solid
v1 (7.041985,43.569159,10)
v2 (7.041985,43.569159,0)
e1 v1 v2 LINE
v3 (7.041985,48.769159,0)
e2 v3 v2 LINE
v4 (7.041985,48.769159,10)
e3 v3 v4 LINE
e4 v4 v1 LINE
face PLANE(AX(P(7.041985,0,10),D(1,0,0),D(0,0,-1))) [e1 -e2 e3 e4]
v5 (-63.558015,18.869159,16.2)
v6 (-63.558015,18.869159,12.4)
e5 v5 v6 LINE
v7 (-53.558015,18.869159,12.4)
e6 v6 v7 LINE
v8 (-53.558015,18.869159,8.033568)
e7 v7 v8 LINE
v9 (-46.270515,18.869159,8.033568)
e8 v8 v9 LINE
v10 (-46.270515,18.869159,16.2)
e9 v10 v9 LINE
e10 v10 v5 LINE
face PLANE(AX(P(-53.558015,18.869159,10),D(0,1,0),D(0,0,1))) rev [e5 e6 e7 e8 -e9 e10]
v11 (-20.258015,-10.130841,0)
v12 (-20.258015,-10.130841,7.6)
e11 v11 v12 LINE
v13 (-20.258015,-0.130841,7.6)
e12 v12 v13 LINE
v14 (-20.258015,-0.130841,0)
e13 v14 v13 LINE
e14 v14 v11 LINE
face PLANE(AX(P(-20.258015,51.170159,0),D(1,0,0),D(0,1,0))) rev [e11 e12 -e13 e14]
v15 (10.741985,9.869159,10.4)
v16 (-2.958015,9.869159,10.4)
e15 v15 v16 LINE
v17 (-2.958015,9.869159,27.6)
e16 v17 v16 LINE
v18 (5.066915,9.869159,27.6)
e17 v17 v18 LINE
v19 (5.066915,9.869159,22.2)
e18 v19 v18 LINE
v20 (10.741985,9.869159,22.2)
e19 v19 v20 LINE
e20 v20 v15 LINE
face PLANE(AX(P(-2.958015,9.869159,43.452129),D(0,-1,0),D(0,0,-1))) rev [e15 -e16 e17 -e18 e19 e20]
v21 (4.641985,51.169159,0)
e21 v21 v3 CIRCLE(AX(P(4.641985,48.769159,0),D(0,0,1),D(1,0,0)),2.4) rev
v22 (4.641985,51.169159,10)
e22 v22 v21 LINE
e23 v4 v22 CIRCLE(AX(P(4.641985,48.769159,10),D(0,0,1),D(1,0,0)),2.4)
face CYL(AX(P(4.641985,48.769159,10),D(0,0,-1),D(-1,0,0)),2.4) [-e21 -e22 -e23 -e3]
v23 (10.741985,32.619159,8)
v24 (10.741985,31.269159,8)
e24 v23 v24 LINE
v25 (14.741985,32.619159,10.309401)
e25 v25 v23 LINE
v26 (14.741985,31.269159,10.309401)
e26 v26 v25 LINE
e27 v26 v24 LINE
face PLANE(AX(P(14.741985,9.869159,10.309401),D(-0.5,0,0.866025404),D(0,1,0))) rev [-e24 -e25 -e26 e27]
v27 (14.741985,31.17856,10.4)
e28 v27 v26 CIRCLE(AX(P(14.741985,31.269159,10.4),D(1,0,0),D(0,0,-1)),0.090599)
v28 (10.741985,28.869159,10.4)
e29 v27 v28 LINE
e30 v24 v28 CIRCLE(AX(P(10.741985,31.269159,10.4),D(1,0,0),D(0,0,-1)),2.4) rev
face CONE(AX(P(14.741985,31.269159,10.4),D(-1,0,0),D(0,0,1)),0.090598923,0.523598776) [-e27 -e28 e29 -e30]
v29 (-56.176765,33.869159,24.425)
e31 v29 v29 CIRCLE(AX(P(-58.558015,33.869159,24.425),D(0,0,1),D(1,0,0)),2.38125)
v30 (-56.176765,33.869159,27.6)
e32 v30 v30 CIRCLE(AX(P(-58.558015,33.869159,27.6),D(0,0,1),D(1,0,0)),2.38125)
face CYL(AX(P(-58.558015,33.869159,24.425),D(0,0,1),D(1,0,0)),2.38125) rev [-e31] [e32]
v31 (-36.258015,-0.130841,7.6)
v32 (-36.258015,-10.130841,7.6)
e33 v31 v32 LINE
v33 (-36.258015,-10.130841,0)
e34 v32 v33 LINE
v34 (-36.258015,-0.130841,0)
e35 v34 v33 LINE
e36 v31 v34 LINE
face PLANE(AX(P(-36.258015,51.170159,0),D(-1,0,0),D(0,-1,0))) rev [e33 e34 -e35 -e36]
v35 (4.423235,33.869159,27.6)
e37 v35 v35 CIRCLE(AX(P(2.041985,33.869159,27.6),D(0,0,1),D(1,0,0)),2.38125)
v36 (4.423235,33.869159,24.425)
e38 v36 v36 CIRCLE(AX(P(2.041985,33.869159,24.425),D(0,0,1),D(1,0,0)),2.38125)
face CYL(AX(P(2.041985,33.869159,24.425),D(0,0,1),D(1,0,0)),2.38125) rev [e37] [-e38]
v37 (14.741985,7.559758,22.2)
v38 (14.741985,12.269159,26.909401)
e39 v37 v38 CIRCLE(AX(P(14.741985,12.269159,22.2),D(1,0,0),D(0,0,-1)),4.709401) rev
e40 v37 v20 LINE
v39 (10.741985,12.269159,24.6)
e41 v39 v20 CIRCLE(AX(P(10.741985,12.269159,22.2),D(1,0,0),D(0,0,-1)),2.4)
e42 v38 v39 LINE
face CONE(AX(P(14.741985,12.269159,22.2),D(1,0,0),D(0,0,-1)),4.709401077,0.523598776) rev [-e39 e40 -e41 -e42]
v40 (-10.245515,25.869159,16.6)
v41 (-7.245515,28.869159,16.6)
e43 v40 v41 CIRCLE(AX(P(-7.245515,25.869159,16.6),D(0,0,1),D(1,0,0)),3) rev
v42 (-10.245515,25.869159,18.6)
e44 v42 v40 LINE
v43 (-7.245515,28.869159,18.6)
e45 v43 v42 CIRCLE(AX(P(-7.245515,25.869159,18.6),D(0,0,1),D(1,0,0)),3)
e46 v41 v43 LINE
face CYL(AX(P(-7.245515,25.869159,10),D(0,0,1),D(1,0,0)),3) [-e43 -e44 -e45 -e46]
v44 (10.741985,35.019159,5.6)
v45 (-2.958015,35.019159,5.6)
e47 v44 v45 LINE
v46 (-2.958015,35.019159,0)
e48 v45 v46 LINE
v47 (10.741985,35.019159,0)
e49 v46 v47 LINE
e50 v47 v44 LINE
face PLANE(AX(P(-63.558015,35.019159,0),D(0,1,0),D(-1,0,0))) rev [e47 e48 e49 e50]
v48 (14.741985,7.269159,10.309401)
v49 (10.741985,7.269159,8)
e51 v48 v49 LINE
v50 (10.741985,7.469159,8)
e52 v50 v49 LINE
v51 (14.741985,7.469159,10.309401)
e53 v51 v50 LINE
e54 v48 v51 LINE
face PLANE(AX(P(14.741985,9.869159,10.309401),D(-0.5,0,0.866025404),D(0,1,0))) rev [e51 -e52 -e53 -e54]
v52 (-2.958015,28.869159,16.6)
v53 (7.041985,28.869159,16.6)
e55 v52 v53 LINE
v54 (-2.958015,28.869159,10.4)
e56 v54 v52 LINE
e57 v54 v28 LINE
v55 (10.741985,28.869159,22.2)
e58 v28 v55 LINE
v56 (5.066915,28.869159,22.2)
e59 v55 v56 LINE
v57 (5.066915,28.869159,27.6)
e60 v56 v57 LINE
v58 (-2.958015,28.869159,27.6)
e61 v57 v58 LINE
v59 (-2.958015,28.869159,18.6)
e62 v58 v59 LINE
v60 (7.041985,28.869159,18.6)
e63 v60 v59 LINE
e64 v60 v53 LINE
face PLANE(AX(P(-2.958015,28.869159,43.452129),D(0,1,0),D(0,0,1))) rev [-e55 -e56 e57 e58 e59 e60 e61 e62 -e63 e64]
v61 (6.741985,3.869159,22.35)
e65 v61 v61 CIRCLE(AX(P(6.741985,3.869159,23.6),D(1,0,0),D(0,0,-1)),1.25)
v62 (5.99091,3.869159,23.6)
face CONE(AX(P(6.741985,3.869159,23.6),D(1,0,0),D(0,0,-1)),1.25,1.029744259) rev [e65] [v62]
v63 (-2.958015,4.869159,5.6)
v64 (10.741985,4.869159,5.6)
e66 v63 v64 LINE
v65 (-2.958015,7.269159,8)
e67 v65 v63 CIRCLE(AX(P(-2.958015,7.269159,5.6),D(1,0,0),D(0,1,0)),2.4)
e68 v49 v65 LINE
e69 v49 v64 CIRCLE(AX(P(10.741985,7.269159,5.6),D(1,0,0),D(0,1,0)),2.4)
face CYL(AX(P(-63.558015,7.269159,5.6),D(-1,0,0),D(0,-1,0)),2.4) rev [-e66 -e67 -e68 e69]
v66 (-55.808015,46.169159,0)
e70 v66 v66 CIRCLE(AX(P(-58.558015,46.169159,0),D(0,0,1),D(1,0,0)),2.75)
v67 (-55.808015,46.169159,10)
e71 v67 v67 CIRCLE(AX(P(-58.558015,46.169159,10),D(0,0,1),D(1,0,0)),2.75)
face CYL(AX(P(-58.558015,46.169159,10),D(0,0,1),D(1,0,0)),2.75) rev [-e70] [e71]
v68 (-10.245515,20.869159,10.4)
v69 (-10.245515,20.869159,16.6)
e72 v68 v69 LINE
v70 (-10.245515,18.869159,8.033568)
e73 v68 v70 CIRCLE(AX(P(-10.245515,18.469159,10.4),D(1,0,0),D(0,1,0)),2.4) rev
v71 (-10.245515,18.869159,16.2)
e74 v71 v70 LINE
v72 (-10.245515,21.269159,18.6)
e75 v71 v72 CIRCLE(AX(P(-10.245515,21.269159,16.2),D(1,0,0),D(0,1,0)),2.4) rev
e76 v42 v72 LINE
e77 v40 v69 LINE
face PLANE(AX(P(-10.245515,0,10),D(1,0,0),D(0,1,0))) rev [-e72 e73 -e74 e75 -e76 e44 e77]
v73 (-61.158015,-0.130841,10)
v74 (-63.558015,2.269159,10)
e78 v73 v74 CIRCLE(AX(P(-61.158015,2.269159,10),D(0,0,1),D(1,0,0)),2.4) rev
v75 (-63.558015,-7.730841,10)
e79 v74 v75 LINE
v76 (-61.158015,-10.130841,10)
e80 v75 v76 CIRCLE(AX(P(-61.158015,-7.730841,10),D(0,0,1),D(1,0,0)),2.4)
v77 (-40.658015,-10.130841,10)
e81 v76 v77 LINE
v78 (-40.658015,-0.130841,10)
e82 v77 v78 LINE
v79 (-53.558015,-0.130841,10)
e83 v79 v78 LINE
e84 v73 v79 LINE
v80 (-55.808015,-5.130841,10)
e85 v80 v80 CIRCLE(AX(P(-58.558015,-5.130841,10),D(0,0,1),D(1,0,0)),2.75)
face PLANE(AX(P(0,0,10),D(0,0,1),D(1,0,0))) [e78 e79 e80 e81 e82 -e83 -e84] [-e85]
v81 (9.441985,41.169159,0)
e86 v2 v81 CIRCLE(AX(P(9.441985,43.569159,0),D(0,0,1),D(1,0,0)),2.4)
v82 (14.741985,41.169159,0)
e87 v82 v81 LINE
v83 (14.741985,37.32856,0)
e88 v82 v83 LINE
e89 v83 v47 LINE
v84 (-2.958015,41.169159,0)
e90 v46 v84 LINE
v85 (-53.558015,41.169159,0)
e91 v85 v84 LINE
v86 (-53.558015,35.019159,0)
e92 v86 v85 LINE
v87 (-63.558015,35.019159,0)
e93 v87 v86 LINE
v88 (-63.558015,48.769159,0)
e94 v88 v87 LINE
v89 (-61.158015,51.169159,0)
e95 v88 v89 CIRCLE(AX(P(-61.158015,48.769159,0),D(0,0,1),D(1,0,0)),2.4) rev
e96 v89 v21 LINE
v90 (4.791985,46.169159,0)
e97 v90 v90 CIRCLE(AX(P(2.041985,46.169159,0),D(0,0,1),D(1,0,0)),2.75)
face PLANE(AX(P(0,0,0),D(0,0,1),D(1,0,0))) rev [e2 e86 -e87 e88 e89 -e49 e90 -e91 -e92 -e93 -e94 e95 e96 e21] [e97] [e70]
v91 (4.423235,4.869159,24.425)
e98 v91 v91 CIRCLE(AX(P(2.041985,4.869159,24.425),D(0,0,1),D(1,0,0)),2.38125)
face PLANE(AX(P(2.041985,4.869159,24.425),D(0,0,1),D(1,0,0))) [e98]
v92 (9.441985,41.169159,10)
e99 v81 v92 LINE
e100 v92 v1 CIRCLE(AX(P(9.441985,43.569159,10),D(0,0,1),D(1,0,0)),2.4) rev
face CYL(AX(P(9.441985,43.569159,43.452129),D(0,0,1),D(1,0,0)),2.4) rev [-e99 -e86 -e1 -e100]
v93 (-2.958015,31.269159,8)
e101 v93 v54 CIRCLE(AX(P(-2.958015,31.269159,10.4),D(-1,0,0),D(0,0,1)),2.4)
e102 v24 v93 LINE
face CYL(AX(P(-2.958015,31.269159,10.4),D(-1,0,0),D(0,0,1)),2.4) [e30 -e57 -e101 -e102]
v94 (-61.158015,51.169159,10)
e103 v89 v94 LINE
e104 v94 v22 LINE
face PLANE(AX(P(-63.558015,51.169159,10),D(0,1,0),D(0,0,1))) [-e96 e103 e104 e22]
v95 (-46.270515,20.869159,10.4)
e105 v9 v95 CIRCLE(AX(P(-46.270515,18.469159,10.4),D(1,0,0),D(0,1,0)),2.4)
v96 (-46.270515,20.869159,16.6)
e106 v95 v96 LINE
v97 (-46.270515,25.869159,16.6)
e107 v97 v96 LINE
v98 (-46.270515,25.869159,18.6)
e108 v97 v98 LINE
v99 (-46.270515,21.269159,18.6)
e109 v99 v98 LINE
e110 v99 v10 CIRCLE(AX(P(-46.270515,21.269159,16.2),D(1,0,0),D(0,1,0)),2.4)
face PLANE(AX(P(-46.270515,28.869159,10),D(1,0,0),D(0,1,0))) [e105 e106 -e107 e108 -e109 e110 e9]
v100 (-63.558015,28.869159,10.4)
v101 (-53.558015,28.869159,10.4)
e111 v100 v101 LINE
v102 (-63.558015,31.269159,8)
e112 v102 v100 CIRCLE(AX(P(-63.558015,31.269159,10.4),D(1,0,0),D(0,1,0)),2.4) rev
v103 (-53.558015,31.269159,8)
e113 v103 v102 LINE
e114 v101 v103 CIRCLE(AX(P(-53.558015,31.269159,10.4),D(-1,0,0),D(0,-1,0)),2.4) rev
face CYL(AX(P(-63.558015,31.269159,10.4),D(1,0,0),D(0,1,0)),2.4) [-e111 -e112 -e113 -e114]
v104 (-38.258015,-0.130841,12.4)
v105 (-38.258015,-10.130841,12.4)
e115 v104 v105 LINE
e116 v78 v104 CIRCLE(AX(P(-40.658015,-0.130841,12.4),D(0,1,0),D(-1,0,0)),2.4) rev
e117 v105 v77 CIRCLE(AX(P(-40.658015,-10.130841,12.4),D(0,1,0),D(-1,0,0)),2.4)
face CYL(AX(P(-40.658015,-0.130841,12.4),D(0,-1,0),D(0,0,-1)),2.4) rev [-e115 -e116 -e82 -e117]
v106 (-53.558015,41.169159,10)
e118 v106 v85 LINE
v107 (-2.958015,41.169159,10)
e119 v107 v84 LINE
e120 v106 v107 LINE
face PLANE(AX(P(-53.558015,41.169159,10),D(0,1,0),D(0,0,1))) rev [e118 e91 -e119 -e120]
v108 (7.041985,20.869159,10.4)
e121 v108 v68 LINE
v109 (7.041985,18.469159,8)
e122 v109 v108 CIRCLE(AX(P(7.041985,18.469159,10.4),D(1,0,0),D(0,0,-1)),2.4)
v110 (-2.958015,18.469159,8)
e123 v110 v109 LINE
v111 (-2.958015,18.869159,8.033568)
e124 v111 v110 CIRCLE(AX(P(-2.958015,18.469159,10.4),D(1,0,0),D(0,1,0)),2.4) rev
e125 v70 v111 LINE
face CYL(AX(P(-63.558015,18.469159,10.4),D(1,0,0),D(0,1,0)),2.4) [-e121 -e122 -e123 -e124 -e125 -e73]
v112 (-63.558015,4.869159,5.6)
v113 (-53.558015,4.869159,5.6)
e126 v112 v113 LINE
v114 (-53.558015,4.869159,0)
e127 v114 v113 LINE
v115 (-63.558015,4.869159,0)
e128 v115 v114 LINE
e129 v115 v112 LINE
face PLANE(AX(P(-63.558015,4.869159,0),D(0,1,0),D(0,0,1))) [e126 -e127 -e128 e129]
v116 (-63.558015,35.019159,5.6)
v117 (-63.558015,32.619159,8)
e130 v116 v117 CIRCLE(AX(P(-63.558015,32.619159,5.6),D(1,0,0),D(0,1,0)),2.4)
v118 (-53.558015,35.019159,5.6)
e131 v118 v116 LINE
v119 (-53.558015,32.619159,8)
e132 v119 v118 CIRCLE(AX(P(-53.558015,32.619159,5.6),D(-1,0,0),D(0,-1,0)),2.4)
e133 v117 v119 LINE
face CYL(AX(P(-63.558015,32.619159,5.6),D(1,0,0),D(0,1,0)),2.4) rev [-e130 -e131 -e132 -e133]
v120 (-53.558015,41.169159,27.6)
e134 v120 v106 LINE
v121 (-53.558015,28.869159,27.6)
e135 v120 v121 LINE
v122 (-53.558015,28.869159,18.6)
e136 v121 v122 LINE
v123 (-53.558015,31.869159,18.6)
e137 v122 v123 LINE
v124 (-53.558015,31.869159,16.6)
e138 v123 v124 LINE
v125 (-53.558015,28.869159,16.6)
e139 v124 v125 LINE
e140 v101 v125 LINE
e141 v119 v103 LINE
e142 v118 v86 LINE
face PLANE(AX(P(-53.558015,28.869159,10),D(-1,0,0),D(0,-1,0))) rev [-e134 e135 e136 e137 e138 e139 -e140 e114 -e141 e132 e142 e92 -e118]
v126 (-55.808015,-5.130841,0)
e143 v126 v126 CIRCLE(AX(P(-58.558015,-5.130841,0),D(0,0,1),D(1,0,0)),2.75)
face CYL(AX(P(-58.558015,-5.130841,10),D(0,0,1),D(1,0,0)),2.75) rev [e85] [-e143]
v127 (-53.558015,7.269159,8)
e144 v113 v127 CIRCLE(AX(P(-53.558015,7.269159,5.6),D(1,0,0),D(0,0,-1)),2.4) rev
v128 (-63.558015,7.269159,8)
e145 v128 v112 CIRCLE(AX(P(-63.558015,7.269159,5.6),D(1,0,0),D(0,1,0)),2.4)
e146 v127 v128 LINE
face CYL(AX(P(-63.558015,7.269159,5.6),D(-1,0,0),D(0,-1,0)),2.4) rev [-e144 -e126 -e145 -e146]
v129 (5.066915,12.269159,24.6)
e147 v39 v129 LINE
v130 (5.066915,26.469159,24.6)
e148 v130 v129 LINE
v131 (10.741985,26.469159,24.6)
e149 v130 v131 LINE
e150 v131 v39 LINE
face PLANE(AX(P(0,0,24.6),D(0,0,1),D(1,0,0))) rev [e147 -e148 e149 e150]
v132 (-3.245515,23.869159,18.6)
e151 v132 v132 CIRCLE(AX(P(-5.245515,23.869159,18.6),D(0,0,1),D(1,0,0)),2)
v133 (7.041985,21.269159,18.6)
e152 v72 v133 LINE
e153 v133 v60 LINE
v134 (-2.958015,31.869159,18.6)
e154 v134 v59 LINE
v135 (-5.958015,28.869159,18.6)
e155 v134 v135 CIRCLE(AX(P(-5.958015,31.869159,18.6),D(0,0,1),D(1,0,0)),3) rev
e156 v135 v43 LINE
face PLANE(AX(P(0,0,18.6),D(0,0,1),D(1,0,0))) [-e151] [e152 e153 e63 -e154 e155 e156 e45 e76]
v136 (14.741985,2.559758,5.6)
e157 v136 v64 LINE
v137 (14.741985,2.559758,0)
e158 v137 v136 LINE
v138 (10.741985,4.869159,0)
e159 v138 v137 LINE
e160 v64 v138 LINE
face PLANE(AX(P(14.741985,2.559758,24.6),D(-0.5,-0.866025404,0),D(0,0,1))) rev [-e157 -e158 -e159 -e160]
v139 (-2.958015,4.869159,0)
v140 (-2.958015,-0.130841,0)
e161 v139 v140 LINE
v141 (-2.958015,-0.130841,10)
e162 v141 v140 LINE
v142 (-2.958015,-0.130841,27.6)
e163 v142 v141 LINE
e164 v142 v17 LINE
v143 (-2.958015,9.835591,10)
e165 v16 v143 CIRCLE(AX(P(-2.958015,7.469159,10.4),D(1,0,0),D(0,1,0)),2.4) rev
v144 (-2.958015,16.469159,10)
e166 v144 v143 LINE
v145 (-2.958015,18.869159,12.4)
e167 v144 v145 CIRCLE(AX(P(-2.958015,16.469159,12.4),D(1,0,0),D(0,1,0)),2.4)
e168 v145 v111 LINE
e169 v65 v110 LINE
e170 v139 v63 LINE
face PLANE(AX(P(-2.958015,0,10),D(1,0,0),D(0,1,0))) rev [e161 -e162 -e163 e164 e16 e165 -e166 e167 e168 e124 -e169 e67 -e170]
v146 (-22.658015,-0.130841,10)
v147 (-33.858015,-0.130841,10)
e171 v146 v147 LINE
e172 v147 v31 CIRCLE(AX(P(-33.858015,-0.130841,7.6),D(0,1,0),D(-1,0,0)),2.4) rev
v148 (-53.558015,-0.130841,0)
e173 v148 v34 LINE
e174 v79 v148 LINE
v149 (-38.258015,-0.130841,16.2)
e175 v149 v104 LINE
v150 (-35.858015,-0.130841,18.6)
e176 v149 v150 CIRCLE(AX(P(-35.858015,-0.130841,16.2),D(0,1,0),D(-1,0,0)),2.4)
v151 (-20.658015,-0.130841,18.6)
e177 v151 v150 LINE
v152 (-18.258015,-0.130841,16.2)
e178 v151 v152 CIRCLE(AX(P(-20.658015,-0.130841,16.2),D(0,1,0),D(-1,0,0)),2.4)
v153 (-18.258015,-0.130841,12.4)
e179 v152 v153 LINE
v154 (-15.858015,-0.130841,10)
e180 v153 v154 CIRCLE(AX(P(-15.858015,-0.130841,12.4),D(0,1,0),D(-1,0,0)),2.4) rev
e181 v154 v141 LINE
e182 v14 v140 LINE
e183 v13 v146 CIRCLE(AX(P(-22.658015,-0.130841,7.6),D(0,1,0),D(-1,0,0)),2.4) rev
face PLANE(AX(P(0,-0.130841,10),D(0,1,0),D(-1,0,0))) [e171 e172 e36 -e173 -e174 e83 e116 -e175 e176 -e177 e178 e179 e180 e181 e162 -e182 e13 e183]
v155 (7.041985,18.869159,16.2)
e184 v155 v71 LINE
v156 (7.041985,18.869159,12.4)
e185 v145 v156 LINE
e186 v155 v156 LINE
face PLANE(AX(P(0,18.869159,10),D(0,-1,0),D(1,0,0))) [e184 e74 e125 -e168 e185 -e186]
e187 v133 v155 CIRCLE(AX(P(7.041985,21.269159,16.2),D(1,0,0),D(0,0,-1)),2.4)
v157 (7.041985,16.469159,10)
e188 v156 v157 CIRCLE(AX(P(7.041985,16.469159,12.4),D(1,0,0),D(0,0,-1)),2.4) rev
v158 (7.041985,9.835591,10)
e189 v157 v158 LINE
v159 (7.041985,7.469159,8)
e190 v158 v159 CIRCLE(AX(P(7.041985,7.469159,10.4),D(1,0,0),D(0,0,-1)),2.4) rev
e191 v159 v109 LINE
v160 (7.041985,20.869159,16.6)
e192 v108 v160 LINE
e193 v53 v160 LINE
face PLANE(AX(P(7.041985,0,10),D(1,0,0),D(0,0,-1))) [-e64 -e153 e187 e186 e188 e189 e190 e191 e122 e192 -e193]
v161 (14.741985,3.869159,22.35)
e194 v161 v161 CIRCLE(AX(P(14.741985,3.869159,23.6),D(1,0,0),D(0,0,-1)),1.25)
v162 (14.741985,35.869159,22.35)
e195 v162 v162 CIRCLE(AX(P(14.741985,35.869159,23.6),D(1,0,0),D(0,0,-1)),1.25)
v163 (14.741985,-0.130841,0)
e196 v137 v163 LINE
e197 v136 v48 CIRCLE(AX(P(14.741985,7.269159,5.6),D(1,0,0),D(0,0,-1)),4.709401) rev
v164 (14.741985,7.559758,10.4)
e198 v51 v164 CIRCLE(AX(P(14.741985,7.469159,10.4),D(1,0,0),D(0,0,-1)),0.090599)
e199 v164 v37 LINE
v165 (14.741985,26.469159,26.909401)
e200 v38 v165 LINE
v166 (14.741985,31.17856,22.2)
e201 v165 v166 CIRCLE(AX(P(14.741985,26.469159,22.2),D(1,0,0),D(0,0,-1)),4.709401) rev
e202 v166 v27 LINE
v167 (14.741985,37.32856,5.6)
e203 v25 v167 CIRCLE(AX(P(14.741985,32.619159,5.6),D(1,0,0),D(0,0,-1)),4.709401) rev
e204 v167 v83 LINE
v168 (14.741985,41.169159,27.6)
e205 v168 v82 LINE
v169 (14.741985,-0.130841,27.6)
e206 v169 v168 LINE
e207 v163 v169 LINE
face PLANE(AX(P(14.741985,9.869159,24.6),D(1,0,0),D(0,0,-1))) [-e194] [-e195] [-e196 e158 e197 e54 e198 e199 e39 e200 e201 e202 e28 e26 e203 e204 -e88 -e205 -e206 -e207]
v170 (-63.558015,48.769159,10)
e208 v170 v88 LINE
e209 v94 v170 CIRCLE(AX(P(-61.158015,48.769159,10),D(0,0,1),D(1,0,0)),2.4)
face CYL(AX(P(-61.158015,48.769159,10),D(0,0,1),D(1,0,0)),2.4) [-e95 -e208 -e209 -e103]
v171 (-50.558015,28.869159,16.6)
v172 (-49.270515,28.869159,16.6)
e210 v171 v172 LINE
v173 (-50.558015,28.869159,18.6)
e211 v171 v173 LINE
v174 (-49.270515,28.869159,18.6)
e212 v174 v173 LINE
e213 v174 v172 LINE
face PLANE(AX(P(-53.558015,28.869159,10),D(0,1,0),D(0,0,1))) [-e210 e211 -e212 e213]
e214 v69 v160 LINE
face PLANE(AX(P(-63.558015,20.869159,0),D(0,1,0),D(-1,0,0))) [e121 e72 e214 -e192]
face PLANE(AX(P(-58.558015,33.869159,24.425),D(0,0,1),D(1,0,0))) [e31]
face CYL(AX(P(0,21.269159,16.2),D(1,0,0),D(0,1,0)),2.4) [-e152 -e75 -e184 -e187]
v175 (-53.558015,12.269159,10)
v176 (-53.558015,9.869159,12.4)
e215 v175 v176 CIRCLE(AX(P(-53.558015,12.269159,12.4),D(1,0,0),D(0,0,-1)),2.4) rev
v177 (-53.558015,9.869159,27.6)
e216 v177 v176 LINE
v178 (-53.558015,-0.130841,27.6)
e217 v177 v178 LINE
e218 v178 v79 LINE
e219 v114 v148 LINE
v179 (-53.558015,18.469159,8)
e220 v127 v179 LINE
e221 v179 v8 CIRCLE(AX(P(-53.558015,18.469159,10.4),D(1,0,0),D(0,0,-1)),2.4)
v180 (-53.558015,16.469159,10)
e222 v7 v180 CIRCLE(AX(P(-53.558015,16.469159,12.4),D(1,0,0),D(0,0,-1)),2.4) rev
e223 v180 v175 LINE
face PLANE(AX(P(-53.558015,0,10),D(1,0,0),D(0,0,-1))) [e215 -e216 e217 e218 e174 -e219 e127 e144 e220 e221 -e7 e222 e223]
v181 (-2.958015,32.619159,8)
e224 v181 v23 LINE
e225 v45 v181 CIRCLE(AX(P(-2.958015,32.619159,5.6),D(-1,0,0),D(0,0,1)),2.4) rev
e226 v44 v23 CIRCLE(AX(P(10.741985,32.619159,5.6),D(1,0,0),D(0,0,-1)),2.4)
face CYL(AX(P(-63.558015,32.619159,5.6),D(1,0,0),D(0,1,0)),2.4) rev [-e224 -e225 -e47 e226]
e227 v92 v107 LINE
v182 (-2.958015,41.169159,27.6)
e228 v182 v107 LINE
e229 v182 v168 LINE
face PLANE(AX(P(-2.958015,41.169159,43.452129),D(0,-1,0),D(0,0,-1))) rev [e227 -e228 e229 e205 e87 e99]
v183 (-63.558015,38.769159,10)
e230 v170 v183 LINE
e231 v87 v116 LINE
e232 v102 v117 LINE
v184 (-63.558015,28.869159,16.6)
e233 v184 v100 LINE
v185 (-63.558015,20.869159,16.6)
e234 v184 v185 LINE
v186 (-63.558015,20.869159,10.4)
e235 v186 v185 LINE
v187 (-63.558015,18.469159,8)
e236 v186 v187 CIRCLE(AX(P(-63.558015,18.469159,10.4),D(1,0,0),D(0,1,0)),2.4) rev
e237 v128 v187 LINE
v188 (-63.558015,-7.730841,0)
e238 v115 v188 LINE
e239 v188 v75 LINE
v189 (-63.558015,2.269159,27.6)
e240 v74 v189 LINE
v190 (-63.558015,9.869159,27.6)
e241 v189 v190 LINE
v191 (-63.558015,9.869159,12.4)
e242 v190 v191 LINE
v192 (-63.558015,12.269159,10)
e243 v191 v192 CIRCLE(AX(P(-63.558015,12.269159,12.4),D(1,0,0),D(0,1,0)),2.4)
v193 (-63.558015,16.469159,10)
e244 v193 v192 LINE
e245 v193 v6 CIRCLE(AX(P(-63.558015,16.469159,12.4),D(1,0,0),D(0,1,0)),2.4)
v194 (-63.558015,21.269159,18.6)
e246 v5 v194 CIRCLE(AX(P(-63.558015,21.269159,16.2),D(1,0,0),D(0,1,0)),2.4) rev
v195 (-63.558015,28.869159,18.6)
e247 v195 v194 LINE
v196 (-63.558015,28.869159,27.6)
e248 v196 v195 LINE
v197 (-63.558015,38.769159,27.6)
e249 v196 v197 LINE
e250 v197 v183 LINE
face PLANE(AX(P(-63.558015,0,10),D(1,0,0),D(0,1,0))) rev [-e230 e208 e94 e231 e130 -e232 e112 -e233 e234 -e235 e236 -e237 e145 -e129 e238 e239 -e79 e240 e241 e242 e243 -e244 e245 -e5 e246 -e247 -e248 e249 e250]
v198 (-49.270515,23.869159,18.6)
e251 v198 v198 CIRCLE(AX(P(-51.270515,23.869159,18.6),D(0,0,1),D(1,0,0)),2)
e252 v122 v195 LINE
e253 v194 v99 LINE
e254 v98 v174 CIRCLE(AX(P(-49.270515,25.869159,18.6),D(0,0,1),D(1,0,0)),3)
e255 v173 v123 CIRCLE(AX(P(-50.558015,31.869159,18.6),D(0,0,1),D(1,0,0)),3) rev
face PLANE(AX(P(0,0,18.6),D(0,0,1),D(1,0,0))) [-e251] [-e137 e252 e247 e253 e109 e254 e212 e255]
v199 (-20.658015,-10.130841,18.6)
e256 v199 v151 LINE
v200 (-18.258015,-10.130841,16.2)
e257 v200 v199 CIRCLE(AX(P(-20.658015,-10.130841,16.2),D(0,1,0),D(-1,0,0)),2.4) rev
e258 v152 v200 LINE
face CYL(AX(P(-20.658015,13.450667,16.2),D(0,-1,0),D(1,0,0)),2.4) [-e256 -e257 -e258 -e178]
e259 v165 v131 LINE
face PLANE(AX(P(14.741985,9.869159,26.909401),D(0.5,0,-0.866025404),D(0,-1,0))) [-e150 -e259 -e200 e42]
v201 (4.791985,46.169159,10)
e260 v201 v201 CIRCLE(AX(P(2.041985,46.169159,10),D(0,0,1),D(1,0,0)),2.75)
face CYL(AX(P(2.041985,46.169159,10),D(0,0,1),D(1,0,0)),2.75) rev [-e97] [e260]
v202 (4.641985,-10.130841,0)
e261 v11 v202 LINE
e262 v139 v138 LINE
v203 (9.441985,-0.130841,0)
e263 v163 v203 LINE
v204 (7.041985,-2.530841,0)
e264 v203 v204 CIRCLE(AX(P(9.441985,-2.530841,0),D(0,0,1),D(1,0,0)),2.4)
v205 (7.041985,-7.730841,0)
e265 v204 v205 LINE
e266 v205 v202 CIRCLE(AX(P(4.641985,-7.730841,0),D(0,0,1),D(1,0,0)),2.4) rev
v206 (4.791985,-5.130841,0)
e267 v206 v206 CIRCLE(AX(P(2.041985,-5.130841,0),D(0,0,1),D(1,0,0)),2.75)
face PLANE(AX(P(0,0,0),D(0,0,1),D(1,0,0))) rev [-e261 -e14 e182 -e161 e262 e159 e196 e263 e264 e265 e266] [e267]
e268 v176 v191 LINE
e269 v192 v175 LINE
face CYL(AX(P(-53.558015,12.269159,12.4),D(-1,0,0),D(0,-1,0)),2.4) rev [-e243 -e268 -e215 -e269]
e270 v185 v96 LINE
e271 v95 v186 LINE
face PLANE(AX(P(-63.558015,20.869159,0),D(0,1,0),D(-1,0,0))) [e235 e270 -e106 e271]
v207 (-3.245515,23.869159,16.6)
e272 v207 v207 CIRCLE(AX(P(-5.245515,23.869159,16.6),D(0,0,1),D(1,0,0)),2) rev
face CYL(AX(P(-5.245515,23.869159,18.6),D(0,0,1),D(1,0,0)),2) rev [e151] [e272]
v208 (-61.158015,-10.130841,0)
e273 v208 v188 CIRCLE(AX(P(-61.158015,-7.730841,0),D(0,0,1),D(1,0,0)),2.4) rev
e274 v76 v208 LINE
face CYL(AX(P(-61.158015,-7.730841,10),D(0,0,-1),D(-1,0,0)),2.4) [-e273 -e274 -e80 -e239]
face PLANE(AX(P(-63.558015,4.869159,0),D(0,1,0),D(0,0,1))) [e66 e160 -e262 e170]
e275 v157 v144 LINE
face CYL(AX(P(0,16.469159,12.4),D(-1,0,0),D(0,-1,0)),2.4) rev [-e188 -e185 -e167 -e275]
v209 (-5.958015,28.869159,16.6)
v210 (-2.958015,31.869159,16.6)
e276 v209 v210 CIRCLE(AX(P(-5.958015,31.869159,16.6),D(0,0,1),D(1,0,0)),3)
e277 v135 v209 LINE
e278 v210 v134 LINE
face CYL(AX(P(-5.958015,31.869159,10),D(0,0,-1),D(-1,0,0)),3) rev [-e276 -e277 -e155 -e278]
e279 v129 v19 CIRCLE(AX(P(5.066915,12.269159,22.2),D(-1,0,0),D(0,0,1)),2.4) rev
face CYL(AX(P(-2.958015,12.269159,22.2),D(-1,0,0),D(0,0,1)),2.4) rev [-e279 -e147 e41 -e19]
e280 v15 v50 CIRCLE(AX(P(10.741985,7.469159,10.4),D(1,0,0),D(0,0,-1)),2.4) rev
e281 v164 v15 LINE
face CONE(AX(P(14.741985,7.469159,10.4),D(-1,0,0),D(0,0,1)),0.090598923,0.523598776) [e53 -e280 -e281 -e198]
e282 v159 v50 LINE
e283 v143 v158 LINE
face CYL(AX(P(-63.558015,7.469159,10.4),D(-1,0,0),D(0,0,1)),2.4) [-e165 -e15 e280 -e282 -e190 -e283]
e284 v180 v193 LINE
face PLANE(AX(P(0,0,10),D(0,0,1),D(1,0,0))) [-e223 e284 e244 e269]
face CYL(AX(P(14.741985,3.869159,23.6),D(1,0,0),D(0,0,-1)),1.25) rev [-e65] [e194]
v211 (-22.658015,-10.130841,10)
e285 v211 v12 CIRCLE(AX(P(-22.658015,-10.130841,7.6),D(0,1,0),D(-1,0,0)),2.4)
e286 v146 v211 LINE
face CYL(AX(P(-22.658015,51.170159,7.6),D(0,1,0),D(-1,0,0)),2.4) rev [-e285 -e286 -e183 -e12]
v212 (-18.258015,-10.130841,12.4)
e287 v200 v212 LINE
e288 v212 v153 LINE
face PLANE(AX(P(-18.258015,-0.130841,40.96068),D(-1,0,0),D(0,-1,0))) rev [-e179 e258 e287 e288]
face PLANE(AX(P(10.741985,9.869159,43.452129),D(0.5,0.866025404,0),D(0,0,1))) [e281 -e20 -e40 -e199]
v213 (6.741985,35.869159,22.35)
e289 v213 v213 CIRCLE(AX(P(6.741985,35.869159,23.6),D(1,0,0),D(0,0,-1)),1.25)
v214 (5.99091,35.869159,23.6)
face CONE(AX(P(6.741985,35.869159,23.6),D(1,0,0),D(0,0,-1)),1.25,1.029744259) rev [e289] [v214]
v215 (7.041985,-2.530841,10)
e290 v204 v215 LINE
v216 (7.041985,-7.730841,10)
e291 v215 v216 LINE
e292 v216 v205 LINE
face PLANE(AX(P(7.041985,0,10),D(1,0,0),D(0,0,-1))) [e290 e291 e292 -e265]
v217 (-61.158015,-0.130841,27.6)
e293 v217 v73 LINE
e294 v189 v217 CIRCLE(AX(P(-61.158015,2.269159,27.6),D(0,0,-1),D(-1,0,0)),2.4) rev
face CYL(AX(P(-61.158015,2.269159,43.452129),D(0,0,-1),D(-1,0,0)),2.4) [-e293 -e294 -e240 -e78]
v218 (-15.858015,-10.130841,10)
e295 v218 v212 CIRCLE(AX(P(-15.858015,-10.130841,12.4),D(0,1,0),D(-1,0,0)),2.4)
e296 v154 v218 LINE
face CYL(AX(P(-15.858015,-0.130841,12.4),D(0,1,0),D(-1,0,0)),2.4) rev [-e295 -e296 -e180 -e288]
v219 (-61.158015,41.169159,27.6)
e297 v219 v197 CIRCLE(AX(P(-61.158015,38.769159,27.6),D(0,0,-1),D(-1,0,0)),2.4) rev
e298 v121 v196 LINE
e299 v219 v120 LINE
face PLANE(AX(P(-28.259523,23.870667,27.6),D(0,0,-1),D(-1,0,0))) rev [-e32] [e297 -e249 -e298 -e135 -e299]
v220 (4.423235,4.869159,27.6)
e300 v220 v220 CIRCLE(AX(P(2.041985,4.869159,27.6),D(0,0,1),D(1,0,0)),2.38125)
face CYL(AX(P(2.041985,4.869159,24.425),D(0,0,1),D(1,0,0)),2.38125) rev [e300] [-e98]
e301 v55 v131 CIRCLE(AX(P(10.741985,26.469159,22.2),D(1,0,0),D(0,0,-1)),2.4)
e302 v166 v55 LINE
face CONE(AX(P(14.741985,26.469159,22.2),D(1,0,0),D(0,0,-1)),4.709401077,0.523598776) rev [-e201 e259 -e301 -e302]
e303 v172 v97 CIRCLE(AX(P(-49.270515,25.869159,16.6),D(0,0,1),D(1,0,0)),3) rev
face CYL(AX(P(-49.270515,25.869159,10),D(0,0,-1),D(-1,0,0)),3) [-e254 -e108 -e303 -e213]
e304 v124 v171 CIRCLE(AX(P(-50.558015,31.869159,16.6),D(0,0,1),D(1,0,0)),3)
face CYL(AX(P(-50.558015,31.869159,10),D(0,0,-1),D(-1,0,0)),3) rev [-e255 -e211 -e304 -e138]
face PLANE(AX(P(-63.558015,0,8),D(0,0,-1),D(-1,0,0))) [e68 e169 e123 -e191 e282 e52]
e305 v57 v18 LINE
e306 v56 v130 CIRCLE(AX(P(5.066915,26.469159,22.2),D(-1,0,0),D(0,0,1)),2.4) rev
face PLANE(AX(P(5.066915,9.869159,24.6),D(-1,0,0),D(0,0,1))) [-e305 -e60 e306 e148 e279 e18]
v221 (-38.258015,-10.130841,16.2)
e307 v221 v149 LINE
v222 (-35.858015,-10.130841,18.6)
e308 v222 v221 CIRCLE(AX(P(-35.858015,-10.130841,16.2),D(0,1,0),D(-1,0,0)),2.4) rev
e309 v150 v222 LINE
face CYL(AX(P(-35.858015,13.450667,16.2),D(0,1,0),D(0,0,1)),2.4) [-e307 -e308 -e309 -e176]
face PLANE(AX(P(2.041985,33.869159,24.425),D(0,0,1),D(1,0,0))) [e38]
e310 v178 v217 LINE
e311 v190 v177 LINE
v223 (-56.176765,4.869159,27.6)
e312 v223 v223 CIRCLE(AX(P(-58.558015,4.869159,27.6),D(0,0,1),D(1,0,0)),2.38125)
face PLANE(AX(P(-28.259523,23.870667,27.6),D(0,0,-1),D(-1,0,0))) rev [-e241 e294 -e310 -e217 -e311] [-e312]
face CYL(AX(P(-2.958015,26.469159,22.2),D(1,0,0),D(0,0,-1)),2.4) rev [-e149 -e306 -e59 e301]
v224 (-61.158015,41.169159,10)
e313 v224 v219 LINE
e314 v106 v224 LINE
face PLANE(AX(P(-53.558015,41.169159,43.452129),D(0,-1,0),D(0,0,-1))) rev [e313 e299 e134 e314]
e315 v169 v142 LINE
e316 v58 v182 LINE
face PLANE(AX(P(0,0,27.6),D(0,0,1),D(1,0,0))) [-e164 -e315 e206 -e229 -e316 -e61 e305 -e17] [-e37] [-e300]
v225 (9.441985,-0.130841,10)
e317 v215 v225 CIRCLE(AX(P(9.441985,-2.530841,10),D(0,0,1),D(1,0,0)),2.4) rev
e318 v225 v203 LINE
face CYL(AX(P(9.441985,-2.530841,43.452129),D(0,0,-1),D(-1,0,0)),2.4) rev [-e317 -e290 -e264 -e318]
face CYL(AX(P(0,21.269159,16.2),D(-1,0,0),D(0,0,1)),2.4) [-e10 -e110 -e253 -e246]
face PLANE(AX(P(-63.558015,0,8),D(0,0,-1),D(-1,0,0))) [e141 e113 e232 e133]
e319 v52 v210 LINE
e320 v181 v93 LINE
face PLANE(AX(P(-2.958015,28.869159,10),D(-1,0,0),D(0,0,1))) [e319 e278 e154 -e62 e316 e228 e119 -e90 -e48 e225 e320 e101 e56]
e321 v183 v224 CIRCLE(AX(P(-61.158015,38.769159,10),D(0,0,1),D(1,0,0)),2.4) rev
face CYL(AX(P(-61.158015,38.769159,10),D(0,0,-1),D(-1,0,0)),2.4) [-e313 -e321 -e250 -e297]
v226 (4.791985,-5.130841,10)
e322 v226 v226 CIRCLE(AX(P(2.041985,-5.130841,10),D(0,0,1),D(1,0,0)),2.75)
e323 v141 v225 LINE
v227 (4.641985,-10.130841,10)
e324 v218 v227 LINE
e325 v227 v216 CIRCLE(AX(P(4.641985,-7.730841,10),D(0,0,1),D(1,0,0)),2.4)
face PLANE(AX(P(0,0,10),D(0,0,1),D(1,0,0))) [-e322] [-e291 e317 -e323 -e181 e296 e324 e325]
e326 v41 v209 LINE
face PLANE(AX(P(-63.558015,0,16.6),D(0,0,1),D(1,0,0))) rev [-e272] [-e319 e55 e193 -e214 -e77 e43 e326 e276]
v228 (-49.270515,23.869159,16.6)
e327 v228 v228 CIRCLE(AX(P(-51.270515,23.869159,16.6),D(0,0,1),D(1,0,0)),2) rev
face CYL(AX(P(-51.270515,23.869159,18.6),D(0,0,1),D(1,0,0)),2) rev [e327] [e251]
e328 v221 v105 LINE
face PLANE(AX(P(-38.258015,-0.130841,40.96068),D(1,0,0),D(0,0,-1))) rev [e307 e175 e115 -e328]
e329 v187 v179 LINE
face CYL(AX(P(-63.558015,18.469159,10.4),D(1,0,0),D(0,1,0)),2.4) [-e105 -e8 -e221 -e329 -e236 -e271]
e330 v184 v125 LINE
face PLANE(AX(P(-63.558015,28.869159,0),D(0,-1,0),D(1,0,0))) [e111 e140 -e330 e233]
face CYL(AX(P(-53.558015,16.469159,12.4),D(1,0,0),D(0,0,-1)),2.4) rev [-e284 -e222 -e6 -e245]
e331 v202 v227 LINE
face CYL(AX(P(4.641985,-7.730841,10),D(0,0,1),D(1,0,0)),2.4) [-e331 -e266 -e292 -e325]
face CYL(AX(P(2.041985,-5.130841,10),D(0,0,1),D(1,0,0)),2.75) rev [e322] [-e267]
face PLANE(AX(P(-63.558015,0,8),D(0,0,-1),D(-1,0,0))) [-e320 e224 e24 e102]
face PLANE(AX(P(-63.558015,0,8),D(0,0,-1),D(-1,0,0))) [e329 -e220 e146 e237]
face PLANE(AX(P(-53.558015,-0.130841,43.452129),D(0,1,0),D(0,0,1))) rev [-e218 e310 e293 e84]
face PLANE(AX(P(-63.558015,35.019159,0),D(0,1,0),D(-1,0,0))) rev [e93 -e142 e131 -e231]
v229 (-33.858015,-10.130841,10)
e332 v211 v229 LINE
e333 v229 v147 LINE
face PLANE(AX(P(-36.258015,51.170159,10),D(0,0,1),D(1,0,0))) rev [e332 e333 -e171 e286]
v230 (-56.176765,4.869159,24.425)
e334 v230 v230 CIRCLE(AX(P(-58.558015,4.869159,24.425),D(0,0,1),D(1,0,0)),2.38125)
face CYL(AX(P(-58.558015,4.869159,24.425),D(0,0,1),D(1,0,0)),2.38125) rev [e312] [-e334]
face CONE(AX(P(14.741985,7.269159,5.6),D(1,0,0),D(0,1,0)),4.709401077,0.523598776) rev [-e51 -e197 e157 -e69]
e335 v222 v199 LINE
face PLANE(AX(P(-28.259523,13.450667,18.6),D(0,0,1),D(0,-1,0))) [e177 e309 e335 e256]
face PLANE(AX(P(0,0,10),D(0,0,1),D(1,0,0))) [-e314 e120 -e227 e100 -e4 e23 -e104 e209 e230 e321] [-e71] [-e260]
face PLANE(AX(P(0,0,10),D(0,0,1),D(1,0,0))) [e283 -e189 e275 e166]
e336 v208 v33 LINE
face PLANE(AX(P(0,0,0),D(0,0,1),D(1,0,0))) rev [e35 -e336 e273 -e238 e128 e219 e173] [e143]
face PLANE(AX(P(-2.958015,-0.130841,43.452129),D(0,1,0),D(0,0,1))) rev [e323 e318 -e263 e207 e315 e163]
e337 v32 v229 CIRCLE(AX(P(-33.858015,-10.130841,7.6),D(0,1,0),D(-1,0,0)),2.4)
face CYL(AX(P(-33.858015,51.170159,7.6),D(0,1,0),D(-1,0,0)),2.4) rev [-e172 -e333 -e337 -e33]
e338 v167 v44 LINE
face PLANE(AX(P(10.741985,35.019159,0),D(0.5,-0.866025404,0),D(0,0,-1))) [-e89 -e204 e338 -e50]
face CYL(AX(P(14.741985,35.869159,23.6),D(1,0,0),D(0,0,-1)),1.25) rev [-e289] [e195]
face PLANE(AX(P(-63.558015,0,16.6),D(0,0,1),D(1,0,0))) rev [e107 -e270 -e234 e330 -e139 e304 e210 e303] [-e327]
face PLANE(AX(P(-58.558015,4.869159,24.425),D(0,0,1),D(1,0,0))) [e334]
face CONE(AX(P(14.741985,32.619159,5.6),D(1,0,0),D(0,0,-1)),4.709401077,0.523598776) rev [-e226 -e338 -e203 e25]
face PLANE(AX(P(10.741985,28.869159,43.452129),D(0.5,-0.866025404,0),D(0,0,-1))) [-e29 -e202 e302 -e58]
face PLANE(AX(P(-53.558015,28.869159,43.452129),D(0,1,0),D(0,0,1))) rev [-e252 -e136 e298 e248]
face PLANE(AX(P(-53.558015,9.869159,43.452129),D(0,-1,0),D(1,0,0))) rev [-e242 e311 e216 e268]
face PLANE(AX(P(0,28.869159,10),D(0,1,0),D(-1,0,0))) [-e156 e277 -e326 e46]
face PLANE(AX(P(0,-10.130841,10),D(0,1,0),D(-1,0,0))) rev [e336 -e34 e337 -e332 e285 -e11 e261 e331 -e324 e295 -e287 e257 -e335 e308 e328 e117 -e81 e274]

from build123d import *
from OCP.BRepFilletAPI import BRepFilletAPI_MakeChamfer

# Parameters (mm, degrees)
SKETCH1_W                       = 70.6
SKETCH1_H                       = 61.3
BOSS_EXTRUDE1_DEPTH             = 10
SKETCH2_W                       = 17.2875
SKETCH2_H                       = 10
BOSS_EXTRUDE2_DEPTH             = 8.6
M3_CLEARANCE_HOLE1_D            = 4
M3_CLEARANCE_HOLE1_DEPTH        = 10
M3_CLEARANCE_HOLE1_TIP          = 1.201721238
M5_CLEARANCE_HOLE1_D            = 5.5
M5_CLEARANCE_HOLE1_DEPTH        = 10
M5_CLEARANCE_HOLE1_TIP          = 1.652366702
SKETCH11_W                      = 20
SKETCH11_H                      = 10
BOSS_EXTRUDE3_DEPTH             = 8.6
CUT_EXTRUDE1_REACH              = 92.24
SKETCH15_W                      = 16
SKETCH15_H                      = 10
SKETCH16_W                      = 10
SKETCH16_H                      = 10
SKETCH16_H_2                    = 12.3
BOSS_EXTRUDE4_DEPTH             = 17.6
SKETCH17_R                      = 2.38125
CUT_EXTRUDE2_DEPTH              = 3.175
SKETCH18_W                      = 27.6
SKETCH18_H                      = 10
SKETCH18_H_2                    = 12.3
BOSS_EXTRUDE5_DEPTH             = 7.7
SKETCH19_W                      = 8.6
SKETCH19_H                      = 8
CUT_EXTRUDE3_DEPTH              = 98.524011489
SKETCH20_W                      = 9.675069895
SKETCH20_H                      = 19
BOSS_EXTRUDE6_DEPTH             = 3
FILLET4_START                   = -63.558014619
FILLET4_DEPTH                   = 10
FILLET4_START_2                 = 5.066915486
FILLET4_2_DEPTH                 = 9.675069895
FILLET4_START_3                 = -2.958014619
FILLET4_3_DEPTH                 = 10
FILLET4_START_4                 = -10.130841154
FILLET4_4_DEPTH                 = 10
FILLET4_5_DEPTH                 = 79.558014619
FILLET4_START_5                 = 7.041985381
FILLET4_6_DEPTH                 = 8.958014619
FILLET4_START_6                 = -7.815230369
FILLET4_7_DEPTH                 = 14.85721575
FILLET4_START_7                 = -11
FILLET4_8_DEPTH                 = 10.869158846
FILLET5_R                       = 2.4
TAP_DRILL_FOR_M3X0_5_TAP1_D     = 2.5
TAP_DRILL_FOR_M3X0_5_TAP1_DEPTH = 8
TAP_DRILL_FOR_M3X0_5_TAP1_TIP   = 0.751075774
CHAMFER1_SIZE                   = 4
CHAMFER1_SIZE2                  = 2.309401077
FILLET7_R                       = 3


with BuildPart() as part:
    # Sketch1 → Boss-Extrude1 (new body)
    with BuildSketch(Plane.XY):
        with Locations((-28.258014619, 20.519158846)):
            Rectangle(SKETCH1_W, SKETCH1_H)
        Polygon((-2.958014619, -0.130841154), (-53.558014619, -0.130841154), (-53.558014619, 18.869158846), (-46.270514619, 18.869158846), (-46.270514619, 28.869158846), (-53.558014619, 28.869158846), (-53.558014619, 41.169158846), (-2.958014619, 41.169158846), (-2.958014619, 28.869158846), (-10.245514619, 28.869158846), (-10.245514619, 18.869158846), (-2.958014619, 18.869158846), align=None, mode=Mode.SUBTRACT)
    extrude(amount=BOSS_EXTRUDE1_DEPTH)

    # Sketch2 → Boss-Extrude2 (add)
    with BuildSketch(Plane.XY.offset(10)):
        with Locations((-54.914264619, 23.869158846)):
            Rectangle(SKETCH2_W, SKETCH2_H)
        with Locations((-1.601764619, 23.869158846)):
            Rectangle(SKETCH2_W, SKETCH2_H)
    extrude(amount=BOSS_EXTRUDE2_DEPTH)

    # M3 Clearance Hole1
    with Locations(Plane.XY.offset(18.6)):
        with Locations((-51.270514619, 23.869158846), (-5.245514619, 23.869158846)):
            Hole(M3_CLEARANCE_HOLE1_D / 2, depth=M3_CLEARANCE_HOLE1_DEPTH)
            with Locations((0, 0, -(M3_CLEARANCE_HOLE1_DEPTH + M3_CLEARANCE_HOLE1_TIP / 2))):  # 118° drill point
                Cone(0, M3_CLEARANCE_HOLE1_D / 2, M3_CLEARANCE_HOLE1_TIP, mode=Mode.SUBTRACT)

    # M5 Clearance Hole1
    with Locations(Plane.XY.offset(10)):
        with Locations((-58.558014619, -5.130841154), (2.041985381, -5.130841154), (-58.558014619, 46.169158846), (2.041985381, 46.169158846)):
            Hole(M5_CLEARANCE_HOLE1_D / 2, depth=M5_CLEARANCE_HOLE1_DEPTH)
            with Locations((0, 0, -(M5_CLEARANCE_HOLE1_DEPTH + M5_CLEARANCE_HOLE1_TIP / 2))):  # 118° drill point
                Cone(0, M5_CLEARANCE_HOLE1_D / 2, M5_CLEARANCE_HOLE1_TIP, mode=Mode.SUBTRACT)

    # Sketch11 → Boss-Extrude3 (add)
    with BuildSketch(Plane.XY.offset(10)):
        with Locations((-28.258014619, -5.130841154)):
            Rectangle(SKETCH11_W, SKETCH11_H)
    extrude(amount=BOSS_EXTRUDE3_DEPTH)

    # Sketch15 → Cut-Extrude1 (cut, up to next)
    with BuildSketch(Plane.XZ.offset(10.130841154), mode=Mode.PRIVATE) as cut_extrude1_sk1:
        with Locations((-28.258014619, 5)):
            Rectangle(SKETCH15_W, SKETCH15_H)
    cut_extrude1_tool1 = extrude(cut_extrude1_sk1.sketch, amount=-CUT_EXTRUDE1_REACH, mode=Mode.PRIVATE) & part.part
    add(cut_extrude1_tool1.solids().sort_by_distance((-28.258015, -10.130841, 5))[0], mode=Mode.SUBTRACT)

    # Sketch16 → Boss-Extrude4 (add)
    with BuildSketch(Plane.XY.offset(10)):
        with Locations((2.041985381, 4.869158846)):
            Rectangle(SKETCH16_W, SKETCH16_H)
        with Locations((2.041985381, 35.019158846)):
            Rectangle(SKETCH16_W, SKETCH16_H_2)
        with Locations((-58.558014619, 35.019158846)):
            Rectangle(SKETCH16_W, SKETCH16_H_2)
        with Locations((-58.558014619, 4.869158846)):
            Rectangle(SKETCH16_W, SKETCH16_H)
    extrude(amount=BOSS_EXTRUDE4_DEPTH)

    # Sketch17 → Cut-Extrude2 (cut)
    with BuildSketch(Plane.XY.offset(27.6)):
        with Locations((-58.558014619, 4.869158846)):
            Circle(SKETCH17_R)
        with Locations((2.041985381, 33.869158846)):
            Circle(SKETCH17_R)
        with Locations((2.041985381, 4.869158846)):
            Circle(SKETCH17_R)
        with Locations((-58.558014619, 33.869158846)):
            Circle(SKETCH17_R)
    extrude(amount=-CUT_EXTRUDE2_DEPTH, mode=Mode.SUBTRACT)

    # Sketch18 → Boss-Extrude5 (add)
    with BuildSketch(Plane(origin=(7.041985381, 0, 0), x_dir=(0, 0, -1), z_dir=(1, 0, 0))):
        with Locations((-13.8, 4.869158846)):
            Rectangle(SKETCH18_W, SKETCH18_H)
        with Locations((-13.8, 35.019158846)):
            Rectangle(SKETCH18_W, SKETCH18_H_2)
    extrude(amount=BOSS_EXTRUDE5_DEPTH)

    # Sketch19 → Cut-Extrude3 (cut, through all)
    with BuildSketch(Plane(origin=(14.741985381, 0, 0), x_dir=(0, 0, -1), z_dir=(1, 0, 0))):
        Polygon((-8, 4.869158846), (0, 4.869158846), (0, 28.869158846), (-8, 28.869158846), (-8, 20.869158846), align=None)
        Polygon((-8, 28.869158846), (0, 28.869158846), (0, 35.019158846), (-8, 35.019158846), (-8, 30.971185105), align=None)
        with Locations((-12.3, 24.869158846)):
            Rectangle(SKETCH19_W, SKETCH19_H)
    extrude(amount=-CUT_EXTRUDE3_DEPTH, mode=Mode.SUBTRACT)


with BuildPart() as body_2:
    # Sketch20 → Boss-Extrude6 (new body)
    with BuildSketch(Plane.XY.offset(27.6)):
        with Locations((9.904450434, 19.369158846)):
            Rectangle(SKETCH20_W, SKETCH20_H)
    extrude(amount=-BOSS_EXTRUDE6_DEPTH)

    # Combine1: union part
    add(part.part)

    # Fillet4: read off the stored shape, not the designer's step
    # Fillet4 outline → Fillet4 (add)
    with BuildSketch(Plane.YZ.offset(FILLET4_START)):
        with BuildLine():
            Line((9.869158846, 10), (12.269158846, 10))
            ThreePointArc((12.269158846, 10), (10.572102571, 10.702943725), (9.869158846, 12.4))
            Line((9.869158846, 12.4), (9.869158846, 10))
        make_face()
        with BuildLine():
            Line((35.019158846, 8), (32.619158846, 8))
            ThreePointArc((32.619158846, 8), (34.316215121, 7.297056275), (35.019158846, 5.6))
            Line((35.019158846, 5.6), (35.019158846, 8))
        make_face()
        with BuildLine():
            ThreePointArc((4.869158846, 5.6), (5.572102571, 7.297056275), (7.269158846, 8))
            Line((7.269158846, 8), (4.869158846, 8))
            Line((4.869158846, 8), (4.869158846, 5.6))
        make_face()
        with BuildLine():
            ThreePointArc((18.869158846, 12.4), (18.16621512, 10.702943726), (16.469158846, 10))
            Line((16.469158846, 10), (18.869158846, 10))
            Line((18.869158846, 10), (18.869158846, 12.4))
        make_face()
    extrude(amount=FILLET4_DEPTH)

    # Fillet4 2 outline → Fillet4 2 (add)
    with BuildSketch(Plane.YZ.offset(FILLET4_START_2)):
        with BuildLine():
            Line((35.019158846, 8), (32.619158846, 8))
            ThreePointArc((32.619158846, 8), (34.316215121, 7.297056275), (35.019158846, 5.6))
            Line((35.019158846, 5.6), (35.019158846, 8))
        make_face()
        with BuildLine():
            ThreePointArc((4.869158846, 5.6), (5.572102571, 7.297056275), (7.269158846, 8))
            Line((7.269158846, 8), (4.869158846, 8))
            Line((4.869158846, 8), (4.869158846, 5.6))
        make_face()
        with BuildLine():
            Line((9.869158846, 24.6), (9.869158846, 22.2))
            ThreePointArc((9.869158846, 22.2), (10.572102571, 23.897056275), (12.269158846, 24.6))
            Line((12.269158846, 24.6), (9.869158846, 24.6))
        make_face()
        with BuildLine():
            Line((28.869158846, 24.6), (26.469158846, 24.6))
            ThreePointArc((26.469158846, 24.6), (28.166215121, 23.897056275), (28.869158846, 22.2))
            Line((28.869158846, 22.2), (28.869158846, 24.6))
        make_face()
    extrude(amount=FILLET4_2_DEPTH)

    # Fillet4 3 outline → Fillet4 3 (add)
    with BuildSketch(Plane.YZ.offset(FILLET4_START_3)):
        with BuildLine():
            Line((35.019158846, 8), (32.619158846, 8))
            ThreePointArc((32.619158846, 8), (34.316215121, 7.297056275), (35.019158846, 5.6))
            Line((35.019158846, 5.6), (35.019158846, 8))
        make_face()
        with BuildLine():
            ThreePointArc((4.869158846, 5.6), (5.572102571, 7.297056275), (7.269158846, 8))
            Line((7.269158846, 8), (4.869158846, 8))
            Line((4.869158846, 8), (4.869158846, 5.6))
        make_face()
        with BuildLine():
            ThreePointArc((18.869158846, 12.4), (18.16621512, 10.702943726), (16.469158846, 10))
            Line((16.469158846, 10), (18.869158846, 10))
            Line((18.869158846, 10), (18.869158846, 12.4))
        make_face()
    extrude(amount=FILLET4_3_DEPTH)

    # Fillet4 4 outline → Fillet4 4 (add)
    with BuildSketch(Plane(origin=(0, 0, 0), x_dir=(1, 0, 0), z_dir=(0, 1, 0)).offset(FILLET4_START_4)):
        with BuildLine():
            Line((-36.258014619, -10), (-33.858014619, -10))
            ThreePointArc((-33.858014619, -10), (-35.555070894, -9.297056275), (-36.258014619, -7.6))
            Line((-36.258014619, -7.6), (-36.258014619, -10))
        make_face()
        with BuildLine():
            ThreePointArc((-20.258014619, -7.6), (-20.960958344, -9.297056275), (-22.658014619, -10))
            Line((-22.658014619, -10), (-20.258014619, -10))
            Line((-20.258014619, -10), (-20.258014619, -7.6))
        make_face()
        with BuildLine():
            ThreePointArc((-40.658014619, -10), (-38.960958344, -10.702943725), (-38.258014619, -12.4))
            Line((-38.258014619, -12.4), (-38.258014619, -10))
            Line((-38.258014619, -10), (-40.658014619, -10))
        make_face()
        with BuildLine():
            ThreePointArc((-18.258014619, -12.4), (-17.555070894, -10.702943725), (-15.858014619, -10))
            Line((-15.858014619, -10), (-18.258014619, -10))
            Line((-18.258014619, -10), (-18.258014619, -12.4))
        make_face()
    extrude(amount=FILLET4_4_DEPTH)

    # Fillet4 5 outline → Fillet4 5 (cut)
    with BuildSketch(Plane.YZ.offset(FILLET4_START)):
        with BuildLine():
            ThreePointArc((31.269158846, 8), (29.572102571, 8.702943725), (28.869158846, 10.4))
            Line((28.869158846, 10.4), (28.869158846, 8))
            Line((28.869158846, 8), (31.269158846, 8))
        make_face()
        with BuildLine():
            Line((18.869158846, 18.6), (18.869158846, 16.2))
            ThreePointArc((18.869158846, 16.2), (19.572102571, 17.897056275), (21.269158846, 18.6))
            Line((21.269158846, 18.6), (18.869158846, 18.6))
        make_face()
        with BuildLine():
            Line((18.469158846, 8), (20.869158846, 8))
            Line((20.869158846, 8), (20.869158846, 10.4))
            ThreePointArc((20.869158846, 10.4), (20.16621512, 8.702943726), (18.469158846, 8))
        make_face()
    extrude(amount=FILLET4_5_DEPTH, mode=Mode.SUBTRACT)

    # Fillet4 6 outline → Fillet4 6 (cut)
    with BuildSketch(Plane.YZ.offset(FILLET4_START_5)):
        with BuildLine():
            ThreePointArc((9.869158846, 10.4), (9.16621512, 8.702943726), (7.469158846, 8))
            Line((7.469158846, 8), (9.869158846, 8))
            Line((9.869158846, 8), (9.869158846, 10.4))
        make_face()
    extrude(amount=FILLET4_6_DEPTH, mode=Mode.SUBTRACT)

    # Fillet4 7 outline → Fillet4 7 (cut)
    with BuildSketch(Plane.YZ.offset(FILLET4_START_6)):
        with BuildLine():
            Line((9.835590759, 10), (9.869158846, 10))
            Line((9.869158846, 10), (9.869158846, 10.4))
            ThreePointArc((9.869158846, 10.4), (9.860752101, 10.199296975), (9.835590759, 10))
        make_face()
    extrude(amount=FILLET4_7_DEPTH, mode=Mode.SUBTRACT)

    # Fillet4 8 outline → Fillet4 8 (cut)
    with BuildSketch(Plane(origin=(0, 0, 0), x_dir=(1, 0, 0), z_dir=(0, 1, 0)).offset(FILLET4_START_7)):
        with BuildLine():
            Line((-38.258014619, -18.6), (-35.858014619, -18.6))
            ThreePointArc((-35.858014619, -18.6), (-37.555070894, -17.897056275), (-38.258014619, -16.2))
            Line((-38.258014619, -16.2), (-38.258014619, -18.6))
        make_face()
        with BuildLine():
            Line((-18.258014619, -18.6), (-18.258014619, -16.2))
            ThreePointArc((-18.258014619, -16.2), (-18.960958344, -17.897056275), (-20.658014619, -18.6))
            Line((-20.658014619, -18.6), (-18.258014619, -18.6))
        make_face()
    extrude(amount=FILLET4_8_DEPTH, mode=Mode.SUBTRACT)

    # Fillet5
    fillet5_edges = [body_2.edges().sort_by_distance(p)[0] for p in [
        (-63.558014619, 41.169158846, 18.8),
        (-63.558014619, 51.169158846, 5),
        (-63.558014619, -10.130841154, 5),
        (7.041985381, -10.130841154, 5),
        (7.041985381, 51.169158846, 5),
        (7.041985381, -0.130841154, 5),
        (7.041985381, 41.169158846, 5),
        (-63.558014619, -0.130841154, 18.8),
    ]]
    fillet(fillet5_edges, radius=FILLET5_R)

    # Tap Drill for M3x0.5 Tap1
    with Locations(Plane(origin=(14.741985381, 0, 0), x_dir=(0, 0, -1), z_dir=(1, 0, 0))):
        with Locations((-23.6, 3.869158846), (-23.6, 35.869158846)):
            Hole(TAP_DRILL_FOR_M3X0_5_TAP1_D / 2, depth=TAP_DRILL_FOR_M3X0_5_TAP1_DEPTH)
            with Locations((0, 0, -(TAP_DRILL_FOR_M3X0_5_TAP1_DEPTH + TAP_DRILL_FOR_M3X0_5_TAP1_TIP / 2))):  # 118° drill point
                Cone(0, TAP_DRILL_FOR_M3X0_5_TAP1_D / 2, TAP_DRILL_FOR_M3X0_5_TAP1_TIP, mode=Mode.SUBTRACT)

    # Chamfer1: one chamfer whose edges measure the first distance from different faces: ONE call of the kernel's chamfer builder (chamfer() names one face for all edges)
    chamfer1_edges_1 = [body_2.edges().sort_by_distance(p)[0] for p in [
        (14.741985381, 7.369158846, 8),
    ]]
    chamfer1_side_1 = [body_2.faces().sort_by_distance(p)[0] for p in [
        (2.162022373, 12.794559586, 8),
    ]]
    chamfer1_edges_2 = [body_2.edges().sort_by_distance(p)[0] for p in [
        (14.741985381, 31.944158846, 8),
    ]]
    chamfer1_side_2 = [body_2.faces().sort_by_distance(p)[0] for p in [
        (5.891985381, 31.944158846, 8),
    ]]
    chamfer1_edges_3 = [body_2.edges().sort_by_distance(p)[0] for p in [
        (14.741985381, 28.869158846, 16.3),
    ]]
    chamfer1_side_3 = [body_2.faces().sort_by_distance(p)[0] for p in [
        (2.041985381, 28.869158846, 18.846805592),
    ]]
    chamfer1_edges_4 = [body_2.edges().sort_by_distance(p)[0] for p in [
        (14.741985381, 9.869158846, 16.3),
    ]]
    chamfer1_side_4 = [body_2.faces().sort_by_distance(p)[0] for p in [
        (5.060751356, 9.869158846, 17.777738702),
    ]]
    chamfer1_edges_5 = [body_2.edges().sort_by_distance(p)[0] for p in [
        (14.741985381, 19.369158846, 24.6),
    ]]
    chamfer1_side_5 = [body_2.faces().sort_by_distance(p)[0] for p in [
        (9.904450433, 19.369158846, 24.6),
    ]]
    chamfer1_edges_6 = [body_2.edges().sort_by_distance(p)[0] for p in [
        (14.741985381, 9.16621512, 8.702943726),
    ]]
    chamfer1_side_6 = [body_2.faces().sort_by_distance(p)[0] for p in [
        (10.891985381, 9.16621512, 8.702943726),
    ]]
    chamfer1_edges_7 = [body_2.edges().sort_by_distance(p)[0] for p in [
        (14.741985381, 29.572102571, 8.702943725),
    ]]
    chamfer1_side_7 = [body_2.faces().sort_by_distance(p)[0] for p in [
        (5.891985381, 29.572102571, 8.702943725),
    ]]
    chamfer1_edges_8 = [body_2.edges().sort_by_distance(p)[0] for p in [
        (14.741985381, 5.572102571, 7.297056275),
    ]]
    chamfer1_side_8 = [body_2.faces().sort_by_distance(p)[0] for p in [
        (5.891985381, 5.572102571, 7.297056275),
    ]]
    chamfer1_edges_9 = [body_2.edges().sort_by_distance(p)[0] for p in [
        (14.741985381, 34.316215121, 7.297056275),
    ]]
    chamfer1_side_9 = [body_2.faces().sort_by_distance(p)[0] for p in [
        (5.891985381, 34.316215121, 7.297056275),
    ]]
    chamfer1_edges_10 = [body_2.edges().sort_by_distance(p)[0] for p in [
        (14.741985381, 28.166215121, 23.897056275),
    ]]
    chamfer1_side_10 = [body_2.faces().sort_by_distance(p)[0] for p in [
        (9.904450433, 28.166215121, 23.897056275),
    ]]
    chamfer1_edges_11 = [body_2.edges().sort_by_distance(p)[0] for p in [
        (14.741985381, 4.869158846, 2.8),
    ]]
    chamfer1_side_11 = [body_2.faces().sort_by_distance(p)[0] for p in [
        (5.891985381, 4.869158846, 2.8),
    ]]
    chamfer1_edges_12 = [body_2.edges().sort_by_distance(p)[0] for p in [
        (14.741985381, 10.572102571, 23.897056275),
    ]]
    chamfer1_side_12 = [body_2.faces().sort_by_distance(p)[0] for p in [
        (9.904450433, 10.572102571, 23.897056275),
    ]]
    chamfer1_edges_13 = [body_2.edges().sort_by_distance(p)[0] for p in [
        (14.741985381, 35.019158846, 2.8),
    ]]
    chamfer1_side_13 = [body_2.faces().sort_by_distance(p)[0] for p in [
        (5.891985381, 35.019158846, 2.8),
    ]]
    chamfer1 = BRepFilletAPI_MakeChamfer(body_2.part.solid().wrapped)
    for e in chamfer1_edges_1:
        chamfer1.Add(CHAMFER1_SIZE, CHAMFER1_SIZE2, e.wrapped, chamfer1_side_1[0].wrapped)  # the first distance lies on this face
    for e in chamfer1_edges_2:
        chamfer1.Add(CHAMFER1_SIZE, CHAMFER1_SIZE2, e.wrapped, chamfer1_side_2[0].wrapped)  # the first distance lies on this face
    for e in chamfer1_edges_3:
        chamfer1.Add(CHAMFER1_SIZE, CHAMFER1_SIZE2, e.wrapped, chamfer1_side_3[0].wrapped)  # the first distance lies on this face
    for e in chamfer1_edges_4:
        chamfer1.Add(CHAMFER1_SIZE, CHAMFER1_SIZE2, e.wrapped, chamfer1_side_4[0].wrapped)  # the first distance lies on this face
    for e in chamfer1_edges_5:
        chamfer1.Add(CHAMFER1_SIZE, CHAMFER1_SIZE2, e.wrapped, chamfer1_side_5[0].wrapped)  # the first distance lies on this face
    for e in chamfer1_edges_6:
        chamfer1.Add(CHAMFER1_SIZE, CHAMFER1_SIZE2, e.wrapped, chamfer1_side_6[0].wrapped)  # the first distance lies on this face
    for e in chamfer1_edges_7:
        chamfer1.Add(CHAMFER1_SIZE, CHAMFER1_SIZE2, e.wrapped, chamfer1_side_7[0].wrapped)  # the first distance lies on this face
    for e in chamfer1_edges_8:
        chamfer1.Add(CHAMFER1_SIZE, CHAMFER1_SIZE2, e.wrapped, chamfer1_side_8[0].wrapped)  # the first distance lies on this face
    for e in chamfer1_edges_9:
        chamfer1.Add(CHAMFER1_SIZE, CHAMFER1_SIZE2, e.wrapped, chamfer1_side_9[0].wrapped)  # the first distance lies on this face
    for e in chamfer1_edges_10:
        chamfer1.Add(CHAMFER1_SIZE, CHAMFER1_SIZE2, e.wrapped, chamfer1_side_10[0].wrapped)  # the first distance lies on this face
    for e in chamfer1_edges_11:
        chamfer1.Add(CHAMFER1_SIZE, CHAMFER1_SIZE2, e.wrapped, chamfer1_side_11[0].wrapped)  # the first distance lies on this face
    for e in chamfer1_edges_12:
        chamfer1.Add(CHAMFER1_SIZE, CHAMFER1_SIZE2, e.wrapped, chamfer1_side_12[0].wrapped)  # the first distance lies on this face
    for e in chamfer1_edges_13:
        chamfer1.Add(CHAMFER1_SIZE, CHAMFER1_SIZE2, e.wrapped, chamfer1_side_13[0].wrapped)  # the first distance lies on this face
    add(Compound.cast(chamfer1.Shape()), mode=Mode.REPLACE)

    # Fillet7
    fillet7_edges = [body_2.edges().sort_by_distance(p)[0] for p in [
        (-46.270514619, 28.869158846, 17.6),
        (-10.245514619, 28.869158846, 17.6),
        (-53.558014619, 28.869158846, 17.6),
        (-2.958014619, 28.869158846, 17.6),
    ]]
    fillet(fillet7_edges, radius=FILLET7_R)


solid = body_2.part
